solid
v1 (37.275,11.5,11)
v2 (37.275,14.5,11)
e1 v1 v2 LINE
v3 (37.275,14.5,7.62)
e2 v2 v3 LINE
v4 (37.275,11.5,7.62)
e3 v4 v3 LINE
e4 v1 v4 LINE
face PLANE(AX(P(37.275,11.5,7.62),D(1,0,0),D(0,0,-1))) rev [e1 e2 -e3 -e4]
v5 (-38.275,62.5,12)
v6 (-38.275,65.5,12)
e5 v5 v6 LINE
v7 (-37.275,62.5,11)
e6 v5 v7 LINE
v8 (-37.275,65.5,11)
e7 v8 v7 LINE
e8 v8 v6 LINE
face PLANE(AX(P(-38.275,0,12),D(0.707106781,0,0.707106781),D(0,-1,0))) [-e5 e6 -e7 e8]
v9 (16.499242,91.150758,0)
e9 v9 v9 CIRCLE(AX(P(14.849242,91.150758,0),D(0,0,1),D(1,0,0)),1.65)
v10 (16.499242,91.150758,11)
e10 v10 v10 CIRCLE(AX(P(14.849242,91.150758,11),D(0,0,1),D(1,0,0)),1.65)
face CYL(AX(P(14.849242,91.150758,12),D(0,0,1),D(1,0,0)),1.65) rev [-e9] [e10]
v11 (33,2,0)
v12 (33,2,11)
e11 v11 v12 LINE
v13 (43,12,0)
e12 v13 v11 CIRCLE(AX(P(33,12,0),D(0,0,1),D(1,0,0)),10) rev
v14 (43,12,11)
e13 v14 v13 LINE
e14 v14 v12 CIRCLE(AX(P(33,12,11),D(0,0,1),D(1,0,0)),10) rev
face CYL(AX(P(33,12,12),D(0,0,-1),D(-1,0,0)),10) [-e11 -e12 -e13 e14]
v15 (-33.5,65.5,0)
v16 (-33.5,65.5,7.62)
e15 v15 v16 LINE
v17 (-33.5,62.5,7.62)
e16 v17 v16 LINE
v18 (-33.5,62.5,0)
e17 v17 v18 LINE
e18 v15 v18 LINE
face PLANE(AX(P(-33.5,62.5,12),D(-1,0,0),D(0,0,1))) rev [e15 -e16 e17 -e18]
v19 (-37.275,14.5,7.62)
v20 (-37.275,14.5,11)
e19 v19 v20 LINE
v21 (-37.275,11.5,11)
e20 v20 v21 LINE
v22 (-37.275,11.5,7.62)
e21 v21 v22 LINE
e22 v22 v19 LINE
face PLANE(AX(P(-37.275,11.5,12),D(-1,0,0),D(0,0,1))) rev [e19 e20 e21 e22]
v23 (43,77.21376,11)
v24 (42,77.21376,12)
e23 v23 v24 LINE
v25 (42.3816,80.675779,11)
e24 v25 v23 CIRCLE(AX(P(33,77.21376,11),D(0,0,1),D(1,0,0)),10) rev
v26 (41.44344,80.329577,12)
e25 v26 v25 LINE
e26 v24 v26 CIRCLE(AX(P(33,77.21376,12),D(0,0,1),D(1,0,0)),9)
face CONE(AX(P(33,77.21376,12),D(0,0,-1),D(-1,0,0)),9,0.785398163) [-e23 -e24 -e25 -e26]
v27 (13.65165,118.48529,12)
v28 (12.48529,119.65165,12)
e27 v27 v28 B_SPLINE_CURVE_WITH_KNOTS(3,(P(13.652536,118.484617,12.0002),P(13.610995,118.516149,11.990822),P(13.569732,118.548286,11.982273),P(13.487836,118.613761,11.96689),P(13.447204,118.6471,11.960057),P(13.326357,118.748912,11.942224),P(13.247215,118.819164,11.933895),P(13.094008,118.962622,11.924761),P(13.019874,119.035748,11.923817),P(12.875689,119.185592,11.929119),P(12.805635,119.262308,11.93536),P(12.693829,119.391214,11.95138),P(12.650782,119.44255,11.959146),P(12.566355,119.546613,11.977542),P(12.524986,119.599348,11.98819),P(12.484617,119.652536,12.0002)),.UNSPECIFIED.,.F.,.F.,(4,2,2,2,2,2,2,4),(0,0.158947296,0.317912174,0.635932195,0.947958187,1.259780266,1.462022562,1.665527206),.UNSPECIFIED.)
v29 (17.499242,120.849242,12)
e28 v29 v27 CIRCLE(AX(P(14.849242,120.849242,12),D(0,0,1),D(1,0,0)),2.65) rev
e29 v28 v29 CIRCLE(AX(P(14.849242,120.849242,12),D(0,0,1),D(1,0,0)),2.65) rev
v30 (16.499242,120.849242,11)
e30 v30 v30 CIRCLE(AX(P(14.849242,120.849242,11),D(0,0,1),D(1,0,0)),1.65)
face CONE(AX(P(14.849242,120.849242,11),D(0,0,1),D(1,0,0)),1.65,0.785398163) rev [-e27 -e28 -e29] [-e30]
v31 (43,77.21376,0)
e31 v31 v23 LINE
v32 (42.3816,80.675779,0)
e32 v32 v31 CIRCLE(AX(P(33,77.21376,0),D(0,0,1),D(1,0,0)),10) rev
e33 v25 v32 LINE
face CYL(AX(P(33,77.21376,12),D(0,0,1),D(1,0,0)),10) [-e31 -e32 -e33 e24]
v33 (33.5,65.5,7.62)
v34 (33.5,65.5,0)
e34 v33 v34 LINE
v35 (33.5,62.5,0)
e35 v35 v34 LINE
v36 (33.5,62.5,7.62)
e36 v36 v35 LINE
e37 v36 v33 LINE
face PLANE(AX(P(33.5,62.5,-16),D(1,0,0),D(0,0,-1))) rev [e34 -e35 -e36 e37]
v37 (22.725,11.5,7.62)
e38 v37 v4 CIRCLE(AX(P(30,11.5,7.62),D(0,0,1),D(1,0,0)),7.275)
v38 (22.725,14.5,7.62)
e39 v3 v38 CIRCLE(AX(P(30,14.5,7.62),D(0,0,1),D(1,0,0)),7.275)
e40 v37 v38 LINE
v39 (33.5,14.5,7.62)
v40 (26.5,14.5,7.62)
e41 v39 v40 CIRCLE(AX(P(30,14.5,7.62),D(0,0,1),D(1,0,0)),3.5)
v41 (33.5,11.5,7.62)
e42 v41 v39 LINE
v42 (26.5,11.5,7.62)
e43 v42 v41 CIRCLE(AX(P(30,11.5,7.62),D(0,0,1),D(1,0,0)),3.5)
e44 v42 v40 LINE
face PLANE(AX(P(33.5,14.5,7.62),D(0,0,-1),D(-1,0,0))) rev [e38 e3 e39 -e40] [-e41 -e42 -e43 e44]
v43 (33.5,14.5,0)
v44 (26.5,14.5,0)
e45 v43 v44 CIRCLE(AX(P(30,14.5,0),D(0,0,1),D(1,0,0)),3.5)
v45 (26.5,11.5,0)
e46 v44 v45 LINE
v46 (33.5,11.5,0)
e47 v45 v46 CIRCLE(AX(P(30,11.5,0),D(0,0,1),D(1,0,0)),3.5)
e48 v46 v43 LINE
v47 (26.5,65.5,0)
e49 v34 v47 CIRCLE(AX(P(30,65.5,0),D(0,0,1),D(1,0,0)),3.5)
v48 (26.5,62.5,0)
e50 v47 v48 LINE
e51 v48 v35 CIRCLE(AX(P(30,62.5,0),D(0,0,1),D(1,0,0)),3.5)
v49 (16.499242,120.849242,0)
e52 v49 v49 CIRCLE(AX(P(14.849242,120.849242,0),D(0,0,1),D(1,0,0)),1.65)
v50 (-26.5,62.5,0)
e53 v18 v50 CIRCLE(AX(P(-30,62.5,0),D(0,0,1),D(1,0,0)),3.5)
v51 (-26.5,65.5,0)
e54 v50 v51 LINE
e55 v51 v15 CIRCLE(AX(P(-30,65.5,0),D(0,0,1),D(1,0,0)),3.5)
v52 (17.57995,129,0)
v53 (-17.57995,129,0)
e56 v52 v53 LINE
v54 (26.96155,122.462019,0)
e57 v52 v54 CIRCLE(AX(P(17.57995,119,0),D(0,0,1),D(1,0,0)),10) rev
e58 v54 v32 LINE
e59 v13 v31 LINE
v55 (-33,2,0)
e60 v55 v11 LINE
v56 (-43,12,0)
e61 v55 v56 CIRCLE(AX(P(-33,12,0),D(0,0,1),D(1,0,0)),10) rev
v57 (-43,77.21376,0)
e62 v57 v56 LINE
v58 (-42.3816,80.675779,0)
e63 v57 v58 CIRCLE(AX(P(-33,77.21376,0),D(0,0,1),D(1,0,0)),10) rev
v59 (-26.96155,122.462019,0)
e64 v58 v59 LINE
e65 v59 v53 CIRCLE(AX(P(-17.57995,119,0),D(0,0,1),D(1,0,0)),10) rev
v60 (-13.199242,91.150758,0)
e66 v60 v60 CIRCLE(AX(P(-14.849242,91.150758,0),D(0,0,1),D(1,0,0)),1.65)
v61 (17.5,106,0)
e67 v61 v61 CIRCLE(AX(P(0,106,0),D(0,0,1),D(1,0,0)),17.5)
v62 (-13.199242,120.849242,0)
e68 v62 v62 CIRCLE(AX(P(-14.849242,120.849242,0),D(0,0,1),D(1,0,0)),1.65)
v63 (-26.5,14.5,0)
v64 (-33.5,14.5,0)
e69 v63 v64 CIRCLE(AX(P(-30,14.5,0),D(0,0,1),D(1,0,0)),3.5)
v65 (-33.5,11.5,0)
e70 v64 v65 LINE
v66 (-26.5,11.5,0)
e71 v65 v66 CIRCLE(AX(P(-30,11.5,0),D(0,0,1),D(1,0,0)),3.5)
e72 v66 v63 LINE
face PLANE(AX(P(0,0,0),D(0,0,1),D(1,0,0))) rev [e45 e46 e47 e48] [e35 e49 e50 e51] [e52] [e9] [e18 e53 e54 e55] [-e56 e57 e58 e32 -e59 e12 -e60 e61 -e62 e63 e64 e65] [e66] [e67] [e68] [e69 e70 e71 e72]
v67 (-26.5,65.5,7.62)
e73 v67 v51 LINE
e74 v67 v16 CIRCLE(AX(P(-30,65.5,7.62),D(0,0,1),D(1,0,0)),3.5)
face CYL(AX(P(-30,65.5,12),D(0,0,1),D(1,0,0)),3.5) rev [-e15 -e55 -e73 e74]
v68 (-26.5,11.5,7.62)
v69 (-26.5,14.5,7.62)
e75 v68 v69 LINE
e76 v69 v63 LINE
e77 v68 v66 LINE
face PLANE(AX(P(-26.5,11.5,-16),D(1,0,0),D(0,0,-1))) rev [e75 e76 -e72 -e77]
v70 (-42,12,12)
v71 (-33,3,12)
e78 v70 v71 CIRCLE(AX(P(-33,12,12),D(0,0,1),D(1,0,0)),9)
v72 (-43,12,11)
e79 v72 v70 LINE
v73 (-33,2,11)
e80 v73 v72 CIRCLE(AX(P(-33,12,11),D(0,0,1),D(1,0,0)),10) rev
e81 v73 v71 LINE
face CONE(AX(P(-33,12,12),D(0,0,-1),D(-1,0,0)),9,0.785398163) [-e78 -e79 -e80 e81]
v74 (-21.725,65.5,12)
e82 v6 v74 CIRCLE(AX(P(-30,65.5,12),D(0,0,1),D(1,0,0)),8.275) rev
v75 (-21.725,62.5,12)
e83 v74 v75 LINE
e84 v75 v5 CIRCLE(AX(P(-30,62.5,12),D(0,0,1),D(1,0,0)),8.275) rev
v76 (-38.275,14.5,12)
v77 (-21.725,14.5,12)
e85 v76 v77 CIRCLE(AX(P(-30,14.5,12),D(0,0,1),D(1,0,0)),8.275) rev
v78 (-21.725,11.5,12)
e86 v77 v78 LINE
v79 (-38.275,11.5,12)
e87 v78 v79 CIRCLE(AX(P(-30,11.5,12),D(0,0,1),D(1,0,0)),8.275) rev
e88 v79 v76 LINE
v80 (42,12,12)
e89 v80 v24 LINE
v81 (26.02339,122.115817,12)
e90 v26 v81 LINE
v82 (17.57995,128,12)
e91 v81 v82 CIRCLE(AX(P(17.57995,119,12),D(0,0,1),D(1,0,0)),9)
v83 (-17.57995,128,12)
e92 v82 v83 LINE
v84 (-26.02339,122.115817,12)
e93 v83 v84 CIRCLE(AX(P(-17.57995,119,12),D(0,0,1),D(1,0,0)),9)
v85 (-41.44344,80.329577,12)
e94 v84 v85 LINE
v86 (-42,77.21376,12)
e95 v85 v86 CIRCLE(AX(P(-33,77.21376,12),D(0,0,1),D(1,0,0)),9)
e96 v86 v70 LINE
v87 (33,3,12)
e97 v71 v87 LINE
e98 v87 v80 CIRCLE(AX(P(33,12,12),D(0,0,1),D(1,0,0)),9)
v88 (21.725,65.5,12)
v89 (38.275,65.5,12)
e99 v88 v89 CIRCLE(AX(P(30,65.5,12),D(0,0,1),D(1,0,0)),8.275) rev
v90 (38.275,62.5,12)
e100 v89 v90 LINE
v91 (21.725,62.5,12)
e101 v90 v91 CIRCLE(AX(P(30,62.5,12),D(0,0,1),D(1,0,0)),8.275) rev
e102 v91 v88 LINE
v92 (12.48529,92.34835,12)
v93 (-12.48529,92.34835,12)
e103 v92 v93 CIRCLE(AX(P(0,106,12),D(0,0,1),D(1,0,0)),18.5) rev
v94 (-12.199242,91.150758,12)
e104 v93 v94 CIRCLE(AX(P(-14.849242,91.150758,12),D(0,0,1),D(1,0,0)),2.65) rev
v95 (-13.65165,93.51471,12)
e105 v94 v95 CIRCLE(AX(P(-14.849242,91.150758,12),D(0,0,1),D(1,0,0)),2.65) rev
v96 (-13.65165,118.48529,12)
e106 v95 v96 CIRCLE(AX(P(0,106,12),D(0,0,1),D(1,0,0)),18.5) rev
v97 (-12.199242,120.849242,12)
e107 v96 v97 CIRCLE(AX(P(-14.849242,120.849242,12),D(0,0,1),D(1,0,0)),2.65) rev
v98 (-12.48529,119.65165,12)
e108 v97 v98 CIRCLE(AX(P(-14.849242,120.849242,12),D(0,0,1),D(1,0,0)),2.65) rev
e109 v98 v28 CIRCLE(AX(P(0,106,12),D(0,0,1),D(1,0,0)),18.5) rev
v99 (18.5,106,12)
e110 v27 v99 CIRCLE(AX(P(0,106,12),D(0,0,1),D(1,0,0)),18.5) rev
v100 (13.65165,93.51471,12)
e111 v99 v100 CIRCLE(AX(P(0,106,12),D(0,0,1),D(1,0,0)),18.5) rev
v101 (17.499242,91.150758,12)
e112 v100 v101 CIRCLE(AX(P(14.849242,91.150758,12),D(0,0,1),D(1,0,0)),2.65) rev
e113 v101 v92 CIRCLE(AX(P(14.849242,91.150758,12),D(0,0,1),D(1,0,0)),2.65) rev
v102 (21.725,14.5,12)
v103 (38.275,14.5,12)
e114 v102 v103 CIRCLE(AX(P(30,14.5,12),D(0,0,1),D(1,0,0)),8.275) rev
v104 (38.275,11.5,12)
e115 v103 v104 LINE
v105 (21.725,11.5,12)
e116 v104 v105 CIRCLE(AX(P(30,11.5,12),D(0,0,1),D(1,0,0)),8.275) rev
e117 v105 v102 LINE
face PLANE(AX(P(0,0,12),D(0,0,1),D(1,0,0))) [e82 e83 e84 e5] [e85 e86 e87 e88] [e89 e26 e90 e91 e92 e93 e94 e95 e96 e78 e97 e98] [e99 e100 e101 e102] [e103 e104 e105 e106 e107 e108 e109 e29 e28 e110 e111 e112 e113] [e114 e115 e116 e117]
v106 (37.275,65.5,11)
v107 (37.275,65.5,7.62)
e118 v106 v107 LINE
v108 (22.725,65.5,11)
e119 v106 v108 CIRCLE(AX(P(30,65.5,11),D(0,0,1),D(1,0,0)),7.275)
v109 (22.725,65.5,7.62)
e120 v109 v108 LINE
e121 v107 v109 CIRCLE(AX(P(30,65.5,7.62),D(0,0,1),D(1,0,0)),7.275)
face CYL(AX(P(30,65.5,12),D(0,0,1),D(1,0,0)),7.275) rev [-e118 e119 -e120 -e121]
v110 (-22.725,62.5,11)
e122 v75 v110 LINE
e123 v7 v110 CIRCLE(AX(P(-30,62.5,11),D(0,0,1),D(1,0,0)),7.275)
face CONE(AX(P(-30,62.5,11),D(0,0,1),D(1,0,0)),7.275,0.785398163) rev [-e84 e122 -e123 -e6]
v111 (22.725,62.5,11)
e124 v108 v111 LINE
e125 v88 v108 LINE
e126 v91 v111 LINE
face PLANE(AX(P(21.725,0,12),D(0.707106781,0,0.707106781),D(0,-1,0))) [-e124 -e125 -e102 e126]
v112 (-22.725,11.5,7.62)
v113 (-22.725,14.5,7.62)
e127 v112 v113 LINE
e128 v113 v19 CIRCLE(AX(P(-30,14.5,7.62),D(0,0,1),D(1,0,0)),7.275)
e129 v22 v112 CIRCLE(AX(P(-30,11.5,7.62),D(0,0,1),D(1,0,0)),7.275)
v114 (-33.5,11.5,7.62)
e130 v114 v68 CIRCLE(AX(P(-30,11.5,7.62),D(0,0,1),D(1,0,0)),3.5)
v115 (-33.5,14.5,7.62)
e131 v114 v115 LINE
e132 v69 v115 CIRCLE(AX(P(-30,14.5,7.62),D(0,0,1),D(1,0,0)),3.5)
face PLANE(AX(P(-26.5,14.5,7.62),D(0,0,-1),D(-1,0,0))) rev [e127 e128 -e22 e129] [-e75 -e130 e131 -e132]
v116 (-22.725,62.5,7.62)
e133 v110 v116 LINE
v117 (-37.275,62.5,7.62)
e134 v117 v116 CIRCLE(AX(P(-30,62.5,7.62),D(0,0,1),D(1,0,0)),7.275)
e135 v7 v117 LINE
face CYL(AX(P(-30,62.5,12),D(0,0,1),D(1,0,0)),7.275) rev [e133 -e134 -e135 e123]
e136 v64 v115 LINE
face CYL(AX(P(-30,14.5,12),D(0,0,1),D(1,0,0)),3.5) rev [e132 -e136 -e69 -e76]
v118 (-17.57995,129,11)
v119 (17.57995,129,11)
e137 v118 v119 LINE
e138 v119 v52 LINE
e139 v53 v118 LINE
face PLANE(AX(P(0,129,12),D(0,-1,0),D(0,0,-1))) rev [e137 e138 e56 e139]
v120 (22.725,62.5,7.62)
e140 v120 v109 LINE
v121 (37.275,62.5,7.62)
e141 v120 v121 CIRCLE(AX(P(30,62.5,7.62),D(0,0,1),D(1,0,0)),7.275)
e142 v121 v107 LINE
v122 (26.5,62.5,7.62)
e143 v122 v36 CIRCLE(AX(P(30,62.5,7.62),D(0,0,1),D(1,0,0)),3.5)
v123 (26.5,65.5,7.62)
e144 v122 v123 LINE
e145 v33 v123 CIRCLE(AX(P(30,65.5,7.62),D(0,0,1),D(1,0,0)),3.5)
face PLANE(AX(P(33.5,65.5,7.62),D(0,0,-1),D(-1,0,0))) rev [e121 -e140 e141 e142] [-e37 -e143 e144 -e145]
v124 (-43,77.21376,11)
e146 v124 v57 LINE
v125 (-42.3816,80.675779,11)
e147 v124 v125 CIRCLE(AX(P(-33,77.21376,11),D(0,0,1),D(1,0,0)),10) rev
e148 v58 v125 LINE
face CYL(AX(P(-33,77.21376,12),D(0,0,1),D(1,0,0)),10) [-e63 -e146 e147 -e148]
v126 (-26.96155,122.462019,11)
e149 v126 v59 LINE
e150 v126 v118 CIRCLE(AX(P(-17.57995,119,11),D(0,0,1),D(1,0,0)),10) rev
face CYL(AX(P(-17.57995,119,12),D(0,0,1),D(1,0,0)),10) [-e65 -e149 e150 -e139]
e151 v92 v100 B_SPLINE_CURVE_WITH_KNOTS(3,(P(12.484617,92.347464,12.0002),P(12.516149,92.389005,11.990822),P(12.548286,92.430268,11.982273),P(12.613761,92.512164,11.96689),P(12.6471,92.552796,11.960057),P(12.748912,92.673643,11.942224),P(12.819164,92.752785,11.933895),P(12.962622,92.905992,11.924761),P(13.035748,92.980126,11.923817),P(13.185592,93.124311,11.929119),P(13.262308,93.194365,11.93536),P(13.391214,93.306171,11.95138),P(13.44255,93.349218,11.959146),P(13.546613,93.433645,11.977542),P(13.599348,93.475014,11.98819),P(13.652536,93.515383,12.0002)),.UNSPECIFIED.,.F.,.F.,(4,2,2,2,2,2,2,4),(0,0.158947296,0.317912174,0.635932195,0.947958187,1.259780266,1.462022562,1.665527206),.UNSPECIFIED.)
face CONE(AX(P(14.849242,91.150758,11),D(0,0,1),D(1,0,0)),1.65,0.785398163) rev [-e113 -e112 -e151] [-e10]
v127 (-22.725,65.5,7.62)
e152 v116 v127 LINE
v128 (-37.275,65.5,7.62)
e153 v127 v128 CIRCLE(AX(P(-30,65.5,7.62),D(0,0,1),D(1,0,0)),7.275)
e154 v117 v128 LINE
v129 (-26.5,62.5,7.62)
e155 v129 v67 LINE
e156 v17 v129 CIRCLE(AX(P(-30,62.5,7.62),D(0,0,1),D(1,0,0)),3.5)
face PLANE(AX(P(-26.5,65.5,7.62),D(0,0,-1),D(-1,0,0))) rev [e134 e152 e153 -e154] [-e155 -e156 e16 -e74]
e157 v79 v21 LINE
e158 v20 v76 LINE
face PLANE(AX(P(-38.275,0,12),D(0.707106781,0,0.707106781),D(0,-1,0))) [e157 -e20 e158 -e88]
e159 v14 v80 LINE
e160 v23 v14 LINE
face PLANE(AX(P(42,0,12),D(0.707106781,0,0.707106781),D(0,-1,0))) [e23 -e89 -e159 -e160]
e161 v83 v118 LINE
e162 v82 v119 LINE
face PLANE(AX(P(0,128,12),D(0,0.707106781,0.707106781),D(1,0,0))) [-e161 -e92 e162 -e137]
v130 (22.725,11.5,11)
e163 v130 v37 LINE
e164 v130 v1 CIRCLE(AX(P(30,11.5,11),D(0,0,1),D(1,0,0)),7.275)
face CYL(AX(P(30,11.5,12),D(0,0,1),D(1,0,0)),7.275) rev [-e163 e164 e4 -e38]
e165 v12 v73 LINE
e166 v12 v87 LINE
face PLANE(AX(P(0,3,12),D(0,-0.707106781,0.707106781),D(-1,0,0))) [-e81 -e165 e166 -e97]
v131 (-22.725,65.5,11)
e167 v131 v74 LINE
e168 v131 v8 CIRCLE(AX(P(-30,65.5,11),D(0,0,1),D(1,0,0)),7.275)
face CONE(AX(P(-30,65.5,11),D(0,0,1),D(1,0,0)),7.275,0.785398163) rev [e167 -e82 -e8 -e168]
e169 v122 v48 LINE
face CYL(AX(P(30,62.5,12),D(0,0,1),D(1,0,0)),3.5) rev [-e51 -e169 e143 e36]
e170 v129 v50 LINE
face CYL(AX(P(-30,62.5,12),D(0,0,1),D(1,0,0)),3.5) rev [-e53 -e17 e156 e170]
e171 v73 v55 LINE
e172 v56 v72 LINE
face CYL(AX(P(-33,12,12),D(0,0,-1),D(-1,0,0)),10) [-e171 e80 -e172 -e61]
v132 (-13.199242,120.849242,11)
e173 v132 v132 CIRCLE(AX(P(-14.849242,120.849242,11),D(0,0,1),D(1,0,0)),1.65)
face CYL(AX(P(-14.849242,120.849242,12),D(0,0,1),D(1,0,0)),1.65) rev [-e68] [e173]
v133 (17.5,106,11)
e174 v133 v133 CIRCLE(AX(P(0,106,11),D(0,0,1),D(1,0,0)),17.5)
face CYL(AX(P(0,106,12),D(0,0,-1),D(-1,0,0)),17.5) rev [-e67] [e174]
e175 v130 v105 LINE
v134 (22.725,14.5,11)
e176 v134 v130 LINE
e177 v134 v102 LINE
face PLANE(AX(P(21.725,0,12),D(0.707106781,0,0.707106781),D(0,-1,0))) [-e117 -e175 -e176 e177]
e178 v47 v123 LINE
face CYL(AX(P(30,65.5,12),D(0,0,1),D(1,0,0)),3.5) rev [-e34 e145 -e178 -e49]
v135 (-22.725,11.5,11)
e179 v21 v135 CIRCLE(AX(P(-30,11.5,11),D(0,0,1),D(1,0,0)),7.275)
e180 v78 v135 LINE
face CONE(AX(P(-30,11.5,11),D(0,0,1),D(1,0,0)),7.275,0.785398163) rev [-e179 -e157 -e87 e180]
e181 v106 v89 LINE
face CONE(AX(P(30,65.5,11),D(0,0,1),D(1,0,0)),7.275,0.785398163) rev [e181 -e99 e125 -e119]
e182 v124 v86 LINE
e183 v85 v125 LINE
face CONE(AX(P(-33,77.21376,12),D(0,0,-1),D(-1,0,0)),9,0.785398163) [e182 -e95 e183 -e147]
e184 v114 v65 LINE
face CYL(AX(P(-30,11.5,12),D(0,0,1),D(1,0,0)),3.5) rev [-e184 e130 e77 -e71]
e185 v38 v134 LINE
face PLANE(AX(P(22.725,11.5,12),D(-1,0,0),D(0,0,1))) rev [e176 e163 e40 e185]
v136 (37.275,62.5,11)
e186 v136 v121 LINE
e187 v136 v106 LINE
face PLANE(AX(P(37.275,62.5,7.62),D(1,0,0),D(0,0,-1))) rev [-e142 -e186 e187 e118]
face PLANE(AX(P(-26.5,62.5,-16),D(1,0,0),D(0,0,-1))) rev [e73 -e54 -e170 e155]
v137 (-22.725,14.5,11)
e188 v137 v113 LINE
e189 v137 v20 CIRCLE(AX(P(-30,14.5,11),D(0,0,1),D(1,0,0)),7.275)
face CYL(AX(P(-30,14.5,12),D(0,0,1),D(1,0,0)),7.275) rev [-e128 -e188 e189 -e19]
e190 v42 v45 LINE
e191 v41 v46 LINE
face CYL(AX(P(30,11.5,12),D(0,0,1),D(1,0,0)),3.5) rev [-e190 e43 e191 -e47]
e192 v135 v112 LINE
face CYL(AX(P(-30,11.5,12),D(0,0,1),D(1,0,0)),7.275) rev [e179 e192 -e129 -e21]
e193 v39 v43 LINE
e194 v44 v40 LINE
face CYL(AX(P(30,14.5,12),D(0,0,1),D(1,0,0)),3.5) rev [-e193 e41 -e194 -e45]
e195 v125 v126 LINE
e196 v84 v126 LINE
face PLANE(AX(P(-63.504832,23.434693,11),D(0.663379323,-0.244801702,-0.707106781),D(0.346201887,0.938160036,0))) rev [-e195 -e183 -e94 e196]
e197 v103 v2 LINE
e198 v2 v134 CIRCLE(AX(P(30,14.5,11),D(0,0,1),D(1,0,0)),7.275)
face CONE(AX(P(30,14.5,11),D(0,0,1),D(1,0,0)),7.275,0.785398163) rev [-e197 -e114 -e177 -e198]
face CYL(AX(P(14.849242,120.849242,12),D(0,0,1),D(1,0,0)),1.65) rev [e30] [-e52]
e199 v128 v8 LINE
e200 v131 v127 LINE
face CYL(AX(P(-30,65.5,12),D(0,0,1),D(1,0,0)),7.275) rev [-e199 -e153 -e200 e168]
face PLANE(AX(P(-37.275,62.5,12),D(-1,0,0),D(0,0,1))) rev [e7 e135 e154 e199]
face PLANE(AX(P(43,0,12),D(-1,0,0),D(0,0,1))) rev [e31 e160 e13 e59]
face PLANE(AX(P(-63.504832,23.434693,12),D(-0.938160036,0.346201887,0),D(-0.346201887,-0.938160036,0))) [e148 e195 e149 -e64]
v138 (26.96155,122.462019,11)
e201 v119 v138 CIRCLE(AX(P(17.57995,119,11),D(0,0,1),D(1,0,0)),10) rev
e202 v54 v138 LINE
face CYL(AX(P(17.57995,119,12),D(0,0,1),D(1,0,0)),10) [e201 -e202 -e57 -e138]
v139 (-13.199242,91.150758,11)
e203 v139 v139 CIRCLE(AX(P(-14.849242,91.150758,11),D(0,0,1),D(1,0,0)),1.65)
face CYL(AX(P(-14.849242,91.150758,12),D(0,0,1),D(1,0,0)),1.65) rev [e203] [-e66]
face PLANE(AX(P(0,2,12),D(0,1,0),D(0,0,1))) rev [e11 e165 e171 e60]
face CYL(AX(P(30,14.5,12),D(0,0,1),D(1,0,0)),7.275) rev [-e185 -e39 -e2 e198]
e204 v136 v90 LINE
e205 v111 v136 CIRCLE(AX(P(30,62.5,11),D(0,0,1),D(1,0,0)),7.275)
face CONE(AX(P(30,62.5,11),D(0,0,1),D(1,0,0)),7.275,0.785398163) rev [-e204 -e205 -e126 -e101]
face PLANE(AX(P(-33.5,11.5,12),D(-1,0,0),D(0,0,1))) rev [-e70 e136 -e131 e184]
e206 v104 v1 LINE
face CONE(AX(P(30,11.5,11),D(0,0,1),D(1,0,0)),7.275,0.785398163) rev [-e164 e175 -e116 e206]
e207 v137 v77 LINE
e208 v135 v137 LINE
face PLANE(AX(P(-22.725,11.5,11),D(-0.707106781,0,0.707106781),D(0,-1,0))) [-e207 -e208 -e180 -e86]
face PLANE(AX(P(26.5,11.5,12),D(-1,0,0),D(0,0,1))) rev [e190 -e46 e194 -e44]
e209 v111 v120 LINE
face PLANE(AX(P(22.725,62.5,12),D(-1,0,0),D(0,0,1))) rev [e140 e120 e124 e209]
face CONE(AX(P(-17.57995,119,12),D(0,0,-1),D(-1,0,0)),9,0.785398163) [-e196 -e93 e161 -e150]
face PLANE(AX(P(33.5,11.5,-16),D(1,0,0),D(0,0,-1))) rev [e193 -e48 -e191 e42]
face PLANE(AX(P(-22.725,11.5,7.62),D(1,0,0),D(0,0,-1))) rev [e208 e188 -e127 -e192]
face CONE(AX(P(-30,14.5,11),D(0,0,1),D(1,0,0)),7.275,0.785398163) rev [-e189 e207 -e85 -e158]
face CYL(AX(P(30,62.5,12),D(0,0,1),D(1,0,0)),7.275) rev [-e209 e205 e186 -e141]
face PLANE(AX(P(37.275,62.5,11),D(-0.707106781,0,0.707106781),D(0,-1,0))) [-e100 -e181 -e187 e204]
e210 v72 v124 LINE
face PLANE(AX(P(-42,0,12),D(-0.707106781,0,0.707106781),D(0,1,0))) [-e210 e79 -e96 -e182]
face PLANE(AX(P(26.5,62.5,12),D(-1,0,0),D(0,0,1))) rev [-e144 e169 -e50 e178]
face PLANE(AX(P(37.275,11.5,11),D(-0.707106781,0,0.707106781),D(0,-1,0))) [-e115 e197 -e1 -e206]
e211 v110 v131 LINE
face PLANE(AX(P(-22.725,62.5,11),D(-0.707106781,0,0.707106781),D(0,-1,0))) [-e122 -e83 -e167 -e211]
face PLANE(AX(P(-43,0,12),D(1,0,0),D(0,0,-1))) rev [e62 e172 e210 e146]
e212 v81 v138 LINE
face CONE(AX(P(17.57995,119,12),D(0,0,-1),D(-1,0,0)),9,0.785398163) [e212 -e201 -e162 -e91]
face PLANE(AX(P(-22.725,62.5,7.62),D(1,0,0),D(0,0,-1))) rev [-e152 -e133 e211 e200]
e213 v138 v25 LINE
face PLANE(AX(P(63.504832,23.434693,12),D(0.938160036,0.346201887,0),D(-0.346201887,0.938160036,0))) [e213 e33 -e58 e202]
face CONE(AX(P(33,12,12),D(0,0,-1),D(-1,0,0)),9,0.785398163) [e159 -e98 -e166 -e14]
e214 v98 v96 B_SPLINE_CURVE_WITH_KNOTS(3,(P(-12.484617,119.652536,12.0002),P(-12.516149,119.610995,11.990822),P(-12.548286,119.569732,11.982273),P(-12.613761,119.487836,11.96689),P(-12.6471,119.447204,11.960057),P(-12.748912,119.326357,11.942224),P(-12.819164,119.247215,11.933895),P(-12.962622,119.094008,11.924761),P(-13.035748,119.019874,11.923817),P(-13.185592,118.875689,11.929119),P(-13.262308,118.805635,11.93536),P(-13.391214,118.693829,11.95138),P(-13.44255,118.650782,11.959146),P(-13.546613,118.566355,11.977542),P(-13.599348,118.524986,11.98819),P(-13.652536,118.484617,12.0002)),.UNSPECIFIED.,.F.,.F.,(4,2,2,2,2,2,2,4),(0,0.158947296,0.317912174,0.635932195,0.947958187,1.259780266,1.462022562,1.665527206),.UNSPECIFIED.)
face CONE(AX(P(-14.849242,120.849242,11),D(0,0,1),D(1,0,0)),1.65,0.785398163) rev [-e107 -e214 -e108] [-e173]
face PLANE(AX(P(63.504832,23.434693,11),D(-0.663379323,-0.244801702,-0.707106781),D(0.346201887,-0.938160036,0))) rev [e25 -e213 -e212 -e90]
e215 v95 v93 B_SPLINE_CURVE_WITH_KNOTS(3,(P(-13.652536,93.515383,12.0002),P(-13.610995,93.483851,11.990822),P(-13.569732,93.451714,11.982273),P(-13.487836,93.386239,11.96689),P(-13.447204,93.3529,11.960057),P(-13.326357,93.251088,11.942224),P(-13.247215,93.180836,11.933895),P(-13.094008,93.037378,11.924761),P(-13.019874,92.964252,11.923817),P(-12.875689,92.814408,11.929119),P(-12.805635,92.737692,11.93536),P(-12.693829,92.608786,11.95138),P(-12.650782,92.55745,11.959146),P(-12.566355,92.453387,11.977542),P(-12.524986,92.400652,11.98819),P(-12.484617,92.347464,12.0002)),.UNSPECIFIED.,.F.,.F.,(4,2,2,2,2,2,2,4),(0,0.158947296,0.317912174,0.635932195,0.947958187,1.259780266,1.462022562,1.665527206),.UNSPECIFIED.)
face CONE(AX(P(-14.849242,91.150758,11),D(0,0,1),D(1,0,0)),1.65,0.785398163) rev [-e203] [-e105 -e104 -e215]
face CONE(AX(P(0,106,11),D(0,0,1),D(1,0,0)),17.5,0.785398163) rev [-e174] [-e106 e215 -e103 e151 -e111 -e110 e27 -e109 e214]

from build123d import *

# Parameters (mm, degrees)
SKETCH1_W                                = 86
SKETCH1_H                                = 77
SKETCH1_R                                = 17.5
BOSS_EXTRUDE1_DEPTH                      = 12
CBORE_START                              = 7.62
CBORE_SLOT_FOR_M6_HEX_HEAD_BOLT1_DEPTH   = 4.38
CBORE_SLOT_FOR_M6_HEX_HEAD_BOLT1_2_DEPTH = 7.62
M4X0_7_TAPPED_HOLE1_D                    = 3.3
M4X0_7_TAPPED_HOLE1_DEPTH                = 17.1
M4X0_7_TAPPED_HOLE1_TIP                  = 0.991420021
FILLET1_R                                = 10
CHAMFER1_SIZE                            = 1


# Read off the part's stored shape, not the designer's step: CBORE SLOT for M6 Hex Head Bolt1
with BuildPart() as part:
    # Sketch1 → Boss-Extrude1 (new body)
    # profile 1 of 2: a face of its own
    with BuildSketch(Plane.XY):
        with Locations((0, 40.5)):
            Rectangle(SKETCH1_W, SKETCH1_H)
    # profile 2 of 2: a face of its own
    with BuildSketch(Plane.XY):
        Polygon((-27.043146614, 122.240902798), (-43, 79), (43, 79), (27.043146614, 122.240902798), (24.548889647, 129), (-24.548889647, 129), align=None)
        with Locations((0, 106)):
            Circle(SKETCH1_R, mode=Mode.SUBTRACT)
    extrude(amount=BOSS_EXTRUDE1_DEPTH)

    # CBORE SLOT for M6 Hex Head Bolt1 outline → CBORE SLOT for M6 Hex Head Bolt1 (cut)
    with BuildSketch(Plane.XY.offset(CBORE_START)):
        with BuildLine():
            Line((-22.725, 11.5), (-22.725, 14.5))
            ThreePointArc((-22.725, 14.5), (-30, 21.775), (-37.275, 14.5))
            Line((-37.275, 14.5), (-37.275, 11.5))
            ThreePointArc((-37.275, 11.5), (-30, 4.225), (-22.725, 11.5))
        make_face()
        with BuildLine():
            ThreePointArc((-22.725, 65.5), (-30, 72.775), (-37.275, 65.5))
            Line((-37.275, 65.5), (-37.275, 62.5))
            ThreePointArc((-37.275, 62.5), (-30, 55.225), (-22.725, 62.5))
            Line((-22.725, 62.5), (-22.725, 65.5))
        make_face()
        with BuildLine():
            Line((37.275, 11.5), (37.275, 14.5))
            ThreePointArc((37.275, 14.5), (30, 21.775), (22.725, 14.5))
            Line((22.725, 14.5), (22.725, 11.5))
            ThreePointArc((22.725, 11.5), (30, 4.225), (37.275, 11.5))
        make_face()
        with BuildLine():
            ThreePointArc((37.275, 65.5), (30, 72.775), (22.725, 65.5))
            Line((22.725, 65.5), (22.725, 62.5))
            ThreePointArc((22.725, 62.5), (30, 55.225), (37.275, 62.5))
            Line((37.275, 62.5), (37.275, 65.5))
        make_face()
    extrude(amount=CBORE_SLOT_FOR_M6_HEX_HEAD_BOLT1_DEPTH, mode=Mode.SUBTRACT)

    # CBORE SLOT for M6 Hex Head Bolt1 2 outli → CBORE SLOT for M6 Hex Head Bolt1 2 (cut)
    with BuildSketch(Plane.XY):
        with BuildLine():
            Line((-26.5, 11.5), (-26.5, 14.5))
            ThreePointArc((-26.5, 14.5), (-30, 18), (-33.5, 14.5))
            Line((-33.5, 14.5), (-33.5, 11.5))
            ThreePointArc((-33.5, 11.5), (-30, 8), (-26.5, 11.5))
        make_face()
        with BuildLine():
            ThreePointArc((-33.5, 62.5), (-30, 59), (-26.5, 62.5))
            Line((-26.5, 62.5), (-26.5, 65.5))
            ThreePointArc((-26.5, 65.5), (-30, 69), (-33.5, 65.5))
            Line((-33.5, 65.5), (-33.5, 62.5))
        make_face()
        with BuildLine():
            Line((33.5, 11.5), (33.5, 14.5))
            ThreePointArc((33.5, 14.5), (30, 18), (26.5, 14.5))
            Line((26.5, 14.5), (26.5, 11.5))
            ThreePointArc((26.5, 11.5), (30, 8), (33.5, 11.5))
        make_face()
        with BuildLine():
            ThreePointArc((33.5, 65.5), (30, 69), (26.5, 65.5))
            Line((26.5, 65.5), (26.5, 62.5))
            ThreePointArc((26.5, 62.5), (30, 59), (33.5, 62.5))
            Line((33.5, 62.5), (33.5, 65.5))
        make_face()
    extrude(amount=CBORE_SLOT_FOR_M6_HEX_HEAD_BOLT1_2_DEPTH, mode=Mode.SUBTRACT)

    # M4x0.7 Tapped Hole1
    with Locations(Plane(origin=(-14.849242405, 120.849242405, 12), x_dir=(1, 0, 0), z_dir=(0, 0, 1))):
        with Locations((0, 0), (29.69848481, 0), (29.69848481, -29.69848481), (0, -29.69848481)):
            Hole(M4X0_7_TAPPED_HOLE1_D / 2, depth=M4X0_7_TAPPED_HOLE1_DEPTH)
            with Locations((0, 0, -(M4X0_7_TAPPED_HOLE1_DEPTH + M4X0_7_TAPPED_HOLE1_TIP / 2))):  # 118° drill point
                Cone(0, M4X0_7_TAPPED_HOLE1_D / 2, M4X0_7_TAPPED_HOLE1_TIP, mode=Mode.SUBTRACT)

    # Fillet1
    fillet1_edges = [part.edges().sort_by_distance(p)[0] for p in [
        (-24.548889647, 129, 6),
        (24.548889647, 129, 6),
        (43, 79, 6),
        (43, 2, 6),
        (-43, 2, 6),
        (-43, 79, 6),
    ]]
    fillet(fillet1_edges, radius=FILLET1_R)

    # Chamfer1
    # the kernel refuses this chamfer: 1 mm, written as the material it takes off along each edge
    with BuildSketch(Plane(origin=(-22.725, 62.5, 12), x_dir=(0.9996219169112968, 0, 0.027495876610585647), z_dir=(0, 1, 0)), Plane(origin=(-37.275, 65.5, 12), x_dir=(-0.9996219169112968, 0, 0.02749587661058555), z_dir=(0, -1, 0)), Plane(origin=(-22.725, 11.5, 12), x_dir=(0.9996219169112968, 0, 0.027495876610585647), z_dir=(0, 1, 0)), Plane(origin=(-37.275, 14.5, 12), x_dir=(-0.9996219169112968, 0, 0.02749587661058555), z_dir=(0, -1, 0)), Plane(origin=(37.275, 11.5, 12), x_dir=(0.9996219169112968, 0, 0.02749587661058555), z_dir=(0, 1, 0)), Plane(origin=(22.725, 14.5, 12), x_dir=(-0.9996219169112968, 0, 0.027495876610585647), z_dir=(0, -1, 0)), Plane(origin=(37.275, 62.5, 12), x_dir=(0.9996219169112968, 0, 0.02749587661058555), z_dir=(0, 1, 0)), Plane(origin=(22.725, 65.5, 12), x_dir=(-0.9996219169112968, 0, 0.027495876610585647), z_dir=(0, -1, 0))) as chamfer1_piece_1:
        Polygon((CHAMFER1_SIZE * 0.999621916911, CHAMFER1_SIZE * 0.0274958766106), (-CHAMFER1_SIZE * 0.0274958766106, CHAMFER1_SIZE * 0.999621916911), (0, 0), align=None)
    extrude(amount=3, mode=Mode.SUBTRACT)
    with BuildSketch(Plane(origin=(-30, 65.5, 12), x_dir=(1, 0, 0), z_dir=(0, -1, 0))) as chamfer1_piece_2:
        Polygon((7.275 + CHAMFER1_SIZE, 0), (7.275, -CHAMFER1_SIZE), (7.275, 0), align=None)
    revolve(axis=Axis((-30, 65.5, 12), (0, 0, 1)), revolution_arc=180, mode=Mode.SUBTRACT)
    with BuildSketch(Plane(origin=(-30, 62.5, 12), x_dir=(-1, 0, 0), z_dir=(0, 1, 0))) as chamfer1_piece_3:
        Polygon((7.275 + CHAMFER1_SIZE, 0), (7.275, -CHAMFER1_SIZE), (7.275, 0), align=None)
    revolve(axis=Axis((-30, 62.5, 12), (0, 0, 1)), revolution_arc=180, mode=Mode.SUBTRACT)
    with BuildSketch(Plane(origin=(-14.849242405, 91.150757595, 12), x_dir=(-1, 0, 0), z_dir=(0, -1, 0))) as chamfer1_piece_4:
        Polygon((1.65 + CHAMFER1_SIZE, 0), (1.65, CHAMFER1_SIZE), (1.65, 0), align=None)
    revolve(axis=Axis((-14.849242405, 91.150757595, 12), (0, 0, -1)), mode=Mode.SUBTRACT)
    with BuildSketch(Plane(origin=(14.849242405, 91.150757595, 12), x_dir=(-1, 0, 0), z_dir=(0, -1, 0))) as chamfer1_piece_5:
        Polygon((1.65 + CHAMFER1_SIZE, 0), (1.65, CHAMFER1_SIZE), (1.65, 0), align=None)
    revolve(axis=Axis((14.849242405, 91.150757595, 12), (0, 0, -1)), mode=Mode.SUBTRACT)
    with BuildSketch(Plane(origin=(14.849242405, 120.849242405, 12), x_dir=(-1, 0, 0), z_dir=(0, -1, 0))) as chamfer1_piece_6:
        Polygon((1.65 + CHAMFER1_SIZE, 0), (1.65, CHAMFER1_SIZE), (1.65, 0), align=None)
    revolve(axis=Axis((14.849242405, 120.849242405, 12), (0, 0, -1)), mode=Mode.SUBTRACT)
    with BuildSketch(Plane(origin=(-14.849242405, 120.849242405, 12), x_dir=(-1, 0, 0), z_dir=(0, -1, 0))) as chamfer1_piece_7:
        Polygon((1.65 + CHAMFER1_SIZE, 0), (1.65, CHAMFER1_SIZE), (1.65, 0), align=None)
    revolve(axis=Axis((-14.849242405, 120.849242405, 12), (0, 0, -1)), mode=Mode.SUBTRACT)
    with BuildSketch(Plane(origin=(-33, 2, 12), x_dir=(0, 0.9996219169112968, 0.027495876610585623), z_dir=(1, 0, 0))) as chamfer1_piece_8:
        Polygon((CHAMFER1_SIZE * 0.999621916911, -CHAMFER1_SIZE * 0.0274958766106), (-CHAMFER1_SIZE * 0.0274958766106, -CHAMFER1_SIZE * 0.999621916911), (0, 0), align=None)
    extrude(amount=66, mode=Mode.SUBTRACT)
    with BuildSketch(Plane(origin=(-43, 77.213760058, 12), x_dir=(-0.0274958766105891, 0, -0.9996219169112968), z_dir=(0, -1, 0))) as chamfer1_piece_9:
        Polygon((CHAMFER1_SIZE * 0.999621916911, CHAMFER1_SIZE * 0.0274958766106), (-CHAMFER1_SIZE * 0.0274958766106, CHAMFER1_SIZE * 0.999621916911), (0, 0), align=None)
    extrude(amount=65.213760058, mode=Mode.SUBTRACT)
    with BuildSketch(Plane(origin=(-42.381600361, 80.675778929, 12), x_dir=(0.9378053336703238, -0.3460709940299939, 0.0274958766105856), z_dir=(0.34620188710878685, 0.938160036114476, 0)), Plane(origin=(26.961549873, 122.462018871, 12), x_dir=(-0.9378053336703737, -0.3460709940298588, 0.027495876610585664), z_dir=(0.34620188710865174, -0.9381600361145258, 0))) as chamfer1_piece_10:
        Polygon((CHAMFER1_SIZE * 0.999621916911, CHAMFER1_SIZE * 0.0274958766106), (-CHAMFER1_SIZE * 0.0274958766106, CHAMFER1_SIZE * 0.999621916911), (0, 0), align=None)
    extrude(amount=44.540630952, mode=Mode.SUBTRACT)
    with BuildSketch(Plane(origin=(43, 12, 12), x_dir=(-0.9996219169112968, 0, 0.02749587661058555), z_dir=(0, 1, 0))) as chamfer1_piece_11:
        Polygon((CHAMFER1_SIZE * 0.999621916911, -CHAMFER1_SIZE * 0.0274958766106), (-CHAMFER1_SIZE * 0.0274958766106, -CHAMFER1_SIZE * 0.999621916911), (0, 0), align=None)
    extrude(amount=65.213760058, mode=Mode.SUBTRACT)
    with BuildSketch(Plane(origin=(17.579949511, 129, 12), x_dir=(0, -0.9996219169112968, 0.02749587661058574), z_dir=(-1, 0, 0))) as chamfer1_piece_12:
        Polygon((CHAMFER1_SIZE * 0.999621916911, -CHAMFER1_SIZE * 0.0274958766106), (-CHAMFER1_SIZE * 0.0274958766106, -CHAMFER1_SIZE * 0.999621916911), (0, 0), align=None)
    extrude(amount=35.159899023, mode=Mode.SUBTRACT)
    with BuildSketch(Plane(origin=(17.579949511, 119, 12), x_dir=(0, 1, 0), z_dir=(-1, 0, 0))) as chamfer1_piece_13:
        Polygon((10 - CHAMFER1_SIZE, 0), (10, CHAMFER1_SIZE), (10, 0), align=None)
    revolve(axis=Axis((17.579949511, 119, 12), (0, 0, -1)), revolution_arc=69.744819304, mode=Mode.SUBTRACT)
    with BuildSketch(Plane(origin=(-17.579949511, 119, 12), x_dir=(-0.9381600361144766, 0.34620188710878497, 0), z_dir=(-0.34620188710878497, -0.9381600361144766, 0))) as chamfer1_piece_14:
        Polygon((10 - CHAMFER1_SIZE, 0), (10, CHAMFER1_SIZE), (10, 0), align=None)
    revolve(axis=Axis((-17.579949511, 119, 12), (0, 0, -1)), revolution_arc=69.744819304, mode=Mode.SUBTRACT)
    with BuildSketch(Plane(origin=(-33, 77.213760058, 12), x_dir=(-1, 0, 0), z_dir=(0, -1, 0))) as chamfer1_piece_15:
        Polygon((10, CHAMFER1_SIZE), (10 - CHAMFER1_SIZE, 0), (10, 0), align=None)
    revolve(axis=Axis((-33, 77.213760058, 12), (0, 0, -1)), revolution_arc=20.255180696, mode=Mode.SUBTRACT)
    with BuildSketch(Plane(origin=(33, 77.213760058, 12), x_dir=(1, 0, 0), z_dir=(0, -1, 0))) as chamfer1_piece_16:
        Polygon((10 - CHAMFER1_SIZE, 0), (10, -CHAMFER1_SIZE), (10, 0), align=None)
    revolve(axis=Axis((33, 77.213760058, 12), (0, 0, 1)), revolution_arc=20.255180696, mode=Mode.SUBTRACT)
    with BuildSketch(Plane(origin=(33, 12, 12), x_dir=(0, -1, 0), z_dir=(-1, 0, 0))) as chamfer1_piece_17:
        Polygon((10 - CHAMFER1_SIZE, 0), (10, -CHAMFER1_SIZE), (10, 0), align=None)
    revolve(axis=Axis((33, 12, 12), (0, 0, 1)), revolution_arc=90, mode=Mode.SUBTRACT)
    with BuildSketch(Plane(origin=(-33, 12, 12), x_dir=(-1, 0, 0), z_dir=(0, 1, 0))) as chamfer1_piece_18:
        Polygon((10, -CHAMFER1_SIZE), (10 - CHAMFER1_SIZE, 0), (10, 0), align=None)
    revolve(axis=Axis((-33, 12, 12), (0, 0, 1)), revolution_arc=90, mode=Mode.SUBTRACT)
    with BuildSketch(Plane(origin=(-30, 14.5, 12), x_dir=(1, 0, 0), z_dir=(0, -1, 0))) as chamfer1_piece_19:
        Polygon((7.275 + CHAMFER1_SIZE, 0), (7.275, -CHAMFER1_SIZE), (7.275, 0), align=None)
    revolve(axis=Axis((-30, 14.5, 12), (0, 0, 1)), revolution_arc=180, mode=Mode.SUBTRACT)
    with BuildSketch(Plane(origin=(-30, 11.5, 12), x_dir=(-1, 0, 0), z_dir=(0, 1, 0))) as chamfer1_piece_20:
        Polygon((7.275 + CHAMFER1_SIZE, 0), (7.275, -CHAMFER1_SIZE), (7.275, 0), align=None)
    revolve(axis=Axis((-30, 11.5, 12), (0, 0, 1)), revolution_arc=180, mode=Mode.SUBTRACT)
    with BuildSketch(Plane(origin=(30, 14.5, 12), x_dir=(1, 0, 0), z_dir=(0, -1, 0))) as chamfer1_piece_21:
        Polygon((7.275 + CHAMFER1_SIZE, 0), (7.275, -CHAMFER1_SIZE), (7.275, 0), align=None)
    revolve(axis=Axis((30, 14.5, 12), (0, 0, 1)), revolution_arc=180, mode=Mode.SUBTRACT)
    with BuildSketch(Plane(origin=(30, 11.5, 12), x_dir=(-1, 0, 0), z_dir=(0, 1, 0))) as chamfer1_piece_22:
        Polygon((7.275 + CHAMFER1_SIZE, 0), (7.275, -CHAMFER1_SIZE), (7.275, 0), align=None)
    revolve(axis=Axis((30, 11.5, 12), (0, 0, 1)), revolution_arc=180, mode=Mode.SUBTRACT)
    with BuildSketch(Plane(origin=(0, 106, 12), x_dir=(1, 0, 0), z_dir=(0, -1, 0))) as chamfer1_piece_23:
        Polygon((17.5 + CHAMFER1_SIZE, 0), (17.5, -CHAMFER1_SIZE), (17.5, 0), align=None)
    revolve(axis=Axis((0, 106, 12), (0, 0, 1)), mode=Mode.SUBTRACT)
    with BuildSketch(Plane(origin=(30, 65.5, 12), x_dir=(1, 0, 0), z_dir=(0, -1, 0))) as chamfer1_piece_24:
        Polygon((7.275 + CHAMFER1_SIZE, 0), (7.275, -CHAMFER1_SIZE), (7.275, 0), align=None)
    revolve(axis=Axis((30, 65.5, 12), (0, 0, 1)), revolution_arc=180, mode=Mode.SUBTRACT)
    with BuildSketch(Plane(origin=(30, 62.5, 12), x_dir=(-1, 0, 0), z_dir=(0, 1, 0))) as chamfer1_piece_25:
        Polygon((7.275 + CHAMFER1_SIZE, 0), (7.275, -CHAMFER1_SIZE), (7.275, 0), align=None)
    revolve(axis=Axis((30, 62.5, 12), (0, 0, 1)), revolution_arc=180, mode=Mode.SUBTRACT)


solid = part.part
